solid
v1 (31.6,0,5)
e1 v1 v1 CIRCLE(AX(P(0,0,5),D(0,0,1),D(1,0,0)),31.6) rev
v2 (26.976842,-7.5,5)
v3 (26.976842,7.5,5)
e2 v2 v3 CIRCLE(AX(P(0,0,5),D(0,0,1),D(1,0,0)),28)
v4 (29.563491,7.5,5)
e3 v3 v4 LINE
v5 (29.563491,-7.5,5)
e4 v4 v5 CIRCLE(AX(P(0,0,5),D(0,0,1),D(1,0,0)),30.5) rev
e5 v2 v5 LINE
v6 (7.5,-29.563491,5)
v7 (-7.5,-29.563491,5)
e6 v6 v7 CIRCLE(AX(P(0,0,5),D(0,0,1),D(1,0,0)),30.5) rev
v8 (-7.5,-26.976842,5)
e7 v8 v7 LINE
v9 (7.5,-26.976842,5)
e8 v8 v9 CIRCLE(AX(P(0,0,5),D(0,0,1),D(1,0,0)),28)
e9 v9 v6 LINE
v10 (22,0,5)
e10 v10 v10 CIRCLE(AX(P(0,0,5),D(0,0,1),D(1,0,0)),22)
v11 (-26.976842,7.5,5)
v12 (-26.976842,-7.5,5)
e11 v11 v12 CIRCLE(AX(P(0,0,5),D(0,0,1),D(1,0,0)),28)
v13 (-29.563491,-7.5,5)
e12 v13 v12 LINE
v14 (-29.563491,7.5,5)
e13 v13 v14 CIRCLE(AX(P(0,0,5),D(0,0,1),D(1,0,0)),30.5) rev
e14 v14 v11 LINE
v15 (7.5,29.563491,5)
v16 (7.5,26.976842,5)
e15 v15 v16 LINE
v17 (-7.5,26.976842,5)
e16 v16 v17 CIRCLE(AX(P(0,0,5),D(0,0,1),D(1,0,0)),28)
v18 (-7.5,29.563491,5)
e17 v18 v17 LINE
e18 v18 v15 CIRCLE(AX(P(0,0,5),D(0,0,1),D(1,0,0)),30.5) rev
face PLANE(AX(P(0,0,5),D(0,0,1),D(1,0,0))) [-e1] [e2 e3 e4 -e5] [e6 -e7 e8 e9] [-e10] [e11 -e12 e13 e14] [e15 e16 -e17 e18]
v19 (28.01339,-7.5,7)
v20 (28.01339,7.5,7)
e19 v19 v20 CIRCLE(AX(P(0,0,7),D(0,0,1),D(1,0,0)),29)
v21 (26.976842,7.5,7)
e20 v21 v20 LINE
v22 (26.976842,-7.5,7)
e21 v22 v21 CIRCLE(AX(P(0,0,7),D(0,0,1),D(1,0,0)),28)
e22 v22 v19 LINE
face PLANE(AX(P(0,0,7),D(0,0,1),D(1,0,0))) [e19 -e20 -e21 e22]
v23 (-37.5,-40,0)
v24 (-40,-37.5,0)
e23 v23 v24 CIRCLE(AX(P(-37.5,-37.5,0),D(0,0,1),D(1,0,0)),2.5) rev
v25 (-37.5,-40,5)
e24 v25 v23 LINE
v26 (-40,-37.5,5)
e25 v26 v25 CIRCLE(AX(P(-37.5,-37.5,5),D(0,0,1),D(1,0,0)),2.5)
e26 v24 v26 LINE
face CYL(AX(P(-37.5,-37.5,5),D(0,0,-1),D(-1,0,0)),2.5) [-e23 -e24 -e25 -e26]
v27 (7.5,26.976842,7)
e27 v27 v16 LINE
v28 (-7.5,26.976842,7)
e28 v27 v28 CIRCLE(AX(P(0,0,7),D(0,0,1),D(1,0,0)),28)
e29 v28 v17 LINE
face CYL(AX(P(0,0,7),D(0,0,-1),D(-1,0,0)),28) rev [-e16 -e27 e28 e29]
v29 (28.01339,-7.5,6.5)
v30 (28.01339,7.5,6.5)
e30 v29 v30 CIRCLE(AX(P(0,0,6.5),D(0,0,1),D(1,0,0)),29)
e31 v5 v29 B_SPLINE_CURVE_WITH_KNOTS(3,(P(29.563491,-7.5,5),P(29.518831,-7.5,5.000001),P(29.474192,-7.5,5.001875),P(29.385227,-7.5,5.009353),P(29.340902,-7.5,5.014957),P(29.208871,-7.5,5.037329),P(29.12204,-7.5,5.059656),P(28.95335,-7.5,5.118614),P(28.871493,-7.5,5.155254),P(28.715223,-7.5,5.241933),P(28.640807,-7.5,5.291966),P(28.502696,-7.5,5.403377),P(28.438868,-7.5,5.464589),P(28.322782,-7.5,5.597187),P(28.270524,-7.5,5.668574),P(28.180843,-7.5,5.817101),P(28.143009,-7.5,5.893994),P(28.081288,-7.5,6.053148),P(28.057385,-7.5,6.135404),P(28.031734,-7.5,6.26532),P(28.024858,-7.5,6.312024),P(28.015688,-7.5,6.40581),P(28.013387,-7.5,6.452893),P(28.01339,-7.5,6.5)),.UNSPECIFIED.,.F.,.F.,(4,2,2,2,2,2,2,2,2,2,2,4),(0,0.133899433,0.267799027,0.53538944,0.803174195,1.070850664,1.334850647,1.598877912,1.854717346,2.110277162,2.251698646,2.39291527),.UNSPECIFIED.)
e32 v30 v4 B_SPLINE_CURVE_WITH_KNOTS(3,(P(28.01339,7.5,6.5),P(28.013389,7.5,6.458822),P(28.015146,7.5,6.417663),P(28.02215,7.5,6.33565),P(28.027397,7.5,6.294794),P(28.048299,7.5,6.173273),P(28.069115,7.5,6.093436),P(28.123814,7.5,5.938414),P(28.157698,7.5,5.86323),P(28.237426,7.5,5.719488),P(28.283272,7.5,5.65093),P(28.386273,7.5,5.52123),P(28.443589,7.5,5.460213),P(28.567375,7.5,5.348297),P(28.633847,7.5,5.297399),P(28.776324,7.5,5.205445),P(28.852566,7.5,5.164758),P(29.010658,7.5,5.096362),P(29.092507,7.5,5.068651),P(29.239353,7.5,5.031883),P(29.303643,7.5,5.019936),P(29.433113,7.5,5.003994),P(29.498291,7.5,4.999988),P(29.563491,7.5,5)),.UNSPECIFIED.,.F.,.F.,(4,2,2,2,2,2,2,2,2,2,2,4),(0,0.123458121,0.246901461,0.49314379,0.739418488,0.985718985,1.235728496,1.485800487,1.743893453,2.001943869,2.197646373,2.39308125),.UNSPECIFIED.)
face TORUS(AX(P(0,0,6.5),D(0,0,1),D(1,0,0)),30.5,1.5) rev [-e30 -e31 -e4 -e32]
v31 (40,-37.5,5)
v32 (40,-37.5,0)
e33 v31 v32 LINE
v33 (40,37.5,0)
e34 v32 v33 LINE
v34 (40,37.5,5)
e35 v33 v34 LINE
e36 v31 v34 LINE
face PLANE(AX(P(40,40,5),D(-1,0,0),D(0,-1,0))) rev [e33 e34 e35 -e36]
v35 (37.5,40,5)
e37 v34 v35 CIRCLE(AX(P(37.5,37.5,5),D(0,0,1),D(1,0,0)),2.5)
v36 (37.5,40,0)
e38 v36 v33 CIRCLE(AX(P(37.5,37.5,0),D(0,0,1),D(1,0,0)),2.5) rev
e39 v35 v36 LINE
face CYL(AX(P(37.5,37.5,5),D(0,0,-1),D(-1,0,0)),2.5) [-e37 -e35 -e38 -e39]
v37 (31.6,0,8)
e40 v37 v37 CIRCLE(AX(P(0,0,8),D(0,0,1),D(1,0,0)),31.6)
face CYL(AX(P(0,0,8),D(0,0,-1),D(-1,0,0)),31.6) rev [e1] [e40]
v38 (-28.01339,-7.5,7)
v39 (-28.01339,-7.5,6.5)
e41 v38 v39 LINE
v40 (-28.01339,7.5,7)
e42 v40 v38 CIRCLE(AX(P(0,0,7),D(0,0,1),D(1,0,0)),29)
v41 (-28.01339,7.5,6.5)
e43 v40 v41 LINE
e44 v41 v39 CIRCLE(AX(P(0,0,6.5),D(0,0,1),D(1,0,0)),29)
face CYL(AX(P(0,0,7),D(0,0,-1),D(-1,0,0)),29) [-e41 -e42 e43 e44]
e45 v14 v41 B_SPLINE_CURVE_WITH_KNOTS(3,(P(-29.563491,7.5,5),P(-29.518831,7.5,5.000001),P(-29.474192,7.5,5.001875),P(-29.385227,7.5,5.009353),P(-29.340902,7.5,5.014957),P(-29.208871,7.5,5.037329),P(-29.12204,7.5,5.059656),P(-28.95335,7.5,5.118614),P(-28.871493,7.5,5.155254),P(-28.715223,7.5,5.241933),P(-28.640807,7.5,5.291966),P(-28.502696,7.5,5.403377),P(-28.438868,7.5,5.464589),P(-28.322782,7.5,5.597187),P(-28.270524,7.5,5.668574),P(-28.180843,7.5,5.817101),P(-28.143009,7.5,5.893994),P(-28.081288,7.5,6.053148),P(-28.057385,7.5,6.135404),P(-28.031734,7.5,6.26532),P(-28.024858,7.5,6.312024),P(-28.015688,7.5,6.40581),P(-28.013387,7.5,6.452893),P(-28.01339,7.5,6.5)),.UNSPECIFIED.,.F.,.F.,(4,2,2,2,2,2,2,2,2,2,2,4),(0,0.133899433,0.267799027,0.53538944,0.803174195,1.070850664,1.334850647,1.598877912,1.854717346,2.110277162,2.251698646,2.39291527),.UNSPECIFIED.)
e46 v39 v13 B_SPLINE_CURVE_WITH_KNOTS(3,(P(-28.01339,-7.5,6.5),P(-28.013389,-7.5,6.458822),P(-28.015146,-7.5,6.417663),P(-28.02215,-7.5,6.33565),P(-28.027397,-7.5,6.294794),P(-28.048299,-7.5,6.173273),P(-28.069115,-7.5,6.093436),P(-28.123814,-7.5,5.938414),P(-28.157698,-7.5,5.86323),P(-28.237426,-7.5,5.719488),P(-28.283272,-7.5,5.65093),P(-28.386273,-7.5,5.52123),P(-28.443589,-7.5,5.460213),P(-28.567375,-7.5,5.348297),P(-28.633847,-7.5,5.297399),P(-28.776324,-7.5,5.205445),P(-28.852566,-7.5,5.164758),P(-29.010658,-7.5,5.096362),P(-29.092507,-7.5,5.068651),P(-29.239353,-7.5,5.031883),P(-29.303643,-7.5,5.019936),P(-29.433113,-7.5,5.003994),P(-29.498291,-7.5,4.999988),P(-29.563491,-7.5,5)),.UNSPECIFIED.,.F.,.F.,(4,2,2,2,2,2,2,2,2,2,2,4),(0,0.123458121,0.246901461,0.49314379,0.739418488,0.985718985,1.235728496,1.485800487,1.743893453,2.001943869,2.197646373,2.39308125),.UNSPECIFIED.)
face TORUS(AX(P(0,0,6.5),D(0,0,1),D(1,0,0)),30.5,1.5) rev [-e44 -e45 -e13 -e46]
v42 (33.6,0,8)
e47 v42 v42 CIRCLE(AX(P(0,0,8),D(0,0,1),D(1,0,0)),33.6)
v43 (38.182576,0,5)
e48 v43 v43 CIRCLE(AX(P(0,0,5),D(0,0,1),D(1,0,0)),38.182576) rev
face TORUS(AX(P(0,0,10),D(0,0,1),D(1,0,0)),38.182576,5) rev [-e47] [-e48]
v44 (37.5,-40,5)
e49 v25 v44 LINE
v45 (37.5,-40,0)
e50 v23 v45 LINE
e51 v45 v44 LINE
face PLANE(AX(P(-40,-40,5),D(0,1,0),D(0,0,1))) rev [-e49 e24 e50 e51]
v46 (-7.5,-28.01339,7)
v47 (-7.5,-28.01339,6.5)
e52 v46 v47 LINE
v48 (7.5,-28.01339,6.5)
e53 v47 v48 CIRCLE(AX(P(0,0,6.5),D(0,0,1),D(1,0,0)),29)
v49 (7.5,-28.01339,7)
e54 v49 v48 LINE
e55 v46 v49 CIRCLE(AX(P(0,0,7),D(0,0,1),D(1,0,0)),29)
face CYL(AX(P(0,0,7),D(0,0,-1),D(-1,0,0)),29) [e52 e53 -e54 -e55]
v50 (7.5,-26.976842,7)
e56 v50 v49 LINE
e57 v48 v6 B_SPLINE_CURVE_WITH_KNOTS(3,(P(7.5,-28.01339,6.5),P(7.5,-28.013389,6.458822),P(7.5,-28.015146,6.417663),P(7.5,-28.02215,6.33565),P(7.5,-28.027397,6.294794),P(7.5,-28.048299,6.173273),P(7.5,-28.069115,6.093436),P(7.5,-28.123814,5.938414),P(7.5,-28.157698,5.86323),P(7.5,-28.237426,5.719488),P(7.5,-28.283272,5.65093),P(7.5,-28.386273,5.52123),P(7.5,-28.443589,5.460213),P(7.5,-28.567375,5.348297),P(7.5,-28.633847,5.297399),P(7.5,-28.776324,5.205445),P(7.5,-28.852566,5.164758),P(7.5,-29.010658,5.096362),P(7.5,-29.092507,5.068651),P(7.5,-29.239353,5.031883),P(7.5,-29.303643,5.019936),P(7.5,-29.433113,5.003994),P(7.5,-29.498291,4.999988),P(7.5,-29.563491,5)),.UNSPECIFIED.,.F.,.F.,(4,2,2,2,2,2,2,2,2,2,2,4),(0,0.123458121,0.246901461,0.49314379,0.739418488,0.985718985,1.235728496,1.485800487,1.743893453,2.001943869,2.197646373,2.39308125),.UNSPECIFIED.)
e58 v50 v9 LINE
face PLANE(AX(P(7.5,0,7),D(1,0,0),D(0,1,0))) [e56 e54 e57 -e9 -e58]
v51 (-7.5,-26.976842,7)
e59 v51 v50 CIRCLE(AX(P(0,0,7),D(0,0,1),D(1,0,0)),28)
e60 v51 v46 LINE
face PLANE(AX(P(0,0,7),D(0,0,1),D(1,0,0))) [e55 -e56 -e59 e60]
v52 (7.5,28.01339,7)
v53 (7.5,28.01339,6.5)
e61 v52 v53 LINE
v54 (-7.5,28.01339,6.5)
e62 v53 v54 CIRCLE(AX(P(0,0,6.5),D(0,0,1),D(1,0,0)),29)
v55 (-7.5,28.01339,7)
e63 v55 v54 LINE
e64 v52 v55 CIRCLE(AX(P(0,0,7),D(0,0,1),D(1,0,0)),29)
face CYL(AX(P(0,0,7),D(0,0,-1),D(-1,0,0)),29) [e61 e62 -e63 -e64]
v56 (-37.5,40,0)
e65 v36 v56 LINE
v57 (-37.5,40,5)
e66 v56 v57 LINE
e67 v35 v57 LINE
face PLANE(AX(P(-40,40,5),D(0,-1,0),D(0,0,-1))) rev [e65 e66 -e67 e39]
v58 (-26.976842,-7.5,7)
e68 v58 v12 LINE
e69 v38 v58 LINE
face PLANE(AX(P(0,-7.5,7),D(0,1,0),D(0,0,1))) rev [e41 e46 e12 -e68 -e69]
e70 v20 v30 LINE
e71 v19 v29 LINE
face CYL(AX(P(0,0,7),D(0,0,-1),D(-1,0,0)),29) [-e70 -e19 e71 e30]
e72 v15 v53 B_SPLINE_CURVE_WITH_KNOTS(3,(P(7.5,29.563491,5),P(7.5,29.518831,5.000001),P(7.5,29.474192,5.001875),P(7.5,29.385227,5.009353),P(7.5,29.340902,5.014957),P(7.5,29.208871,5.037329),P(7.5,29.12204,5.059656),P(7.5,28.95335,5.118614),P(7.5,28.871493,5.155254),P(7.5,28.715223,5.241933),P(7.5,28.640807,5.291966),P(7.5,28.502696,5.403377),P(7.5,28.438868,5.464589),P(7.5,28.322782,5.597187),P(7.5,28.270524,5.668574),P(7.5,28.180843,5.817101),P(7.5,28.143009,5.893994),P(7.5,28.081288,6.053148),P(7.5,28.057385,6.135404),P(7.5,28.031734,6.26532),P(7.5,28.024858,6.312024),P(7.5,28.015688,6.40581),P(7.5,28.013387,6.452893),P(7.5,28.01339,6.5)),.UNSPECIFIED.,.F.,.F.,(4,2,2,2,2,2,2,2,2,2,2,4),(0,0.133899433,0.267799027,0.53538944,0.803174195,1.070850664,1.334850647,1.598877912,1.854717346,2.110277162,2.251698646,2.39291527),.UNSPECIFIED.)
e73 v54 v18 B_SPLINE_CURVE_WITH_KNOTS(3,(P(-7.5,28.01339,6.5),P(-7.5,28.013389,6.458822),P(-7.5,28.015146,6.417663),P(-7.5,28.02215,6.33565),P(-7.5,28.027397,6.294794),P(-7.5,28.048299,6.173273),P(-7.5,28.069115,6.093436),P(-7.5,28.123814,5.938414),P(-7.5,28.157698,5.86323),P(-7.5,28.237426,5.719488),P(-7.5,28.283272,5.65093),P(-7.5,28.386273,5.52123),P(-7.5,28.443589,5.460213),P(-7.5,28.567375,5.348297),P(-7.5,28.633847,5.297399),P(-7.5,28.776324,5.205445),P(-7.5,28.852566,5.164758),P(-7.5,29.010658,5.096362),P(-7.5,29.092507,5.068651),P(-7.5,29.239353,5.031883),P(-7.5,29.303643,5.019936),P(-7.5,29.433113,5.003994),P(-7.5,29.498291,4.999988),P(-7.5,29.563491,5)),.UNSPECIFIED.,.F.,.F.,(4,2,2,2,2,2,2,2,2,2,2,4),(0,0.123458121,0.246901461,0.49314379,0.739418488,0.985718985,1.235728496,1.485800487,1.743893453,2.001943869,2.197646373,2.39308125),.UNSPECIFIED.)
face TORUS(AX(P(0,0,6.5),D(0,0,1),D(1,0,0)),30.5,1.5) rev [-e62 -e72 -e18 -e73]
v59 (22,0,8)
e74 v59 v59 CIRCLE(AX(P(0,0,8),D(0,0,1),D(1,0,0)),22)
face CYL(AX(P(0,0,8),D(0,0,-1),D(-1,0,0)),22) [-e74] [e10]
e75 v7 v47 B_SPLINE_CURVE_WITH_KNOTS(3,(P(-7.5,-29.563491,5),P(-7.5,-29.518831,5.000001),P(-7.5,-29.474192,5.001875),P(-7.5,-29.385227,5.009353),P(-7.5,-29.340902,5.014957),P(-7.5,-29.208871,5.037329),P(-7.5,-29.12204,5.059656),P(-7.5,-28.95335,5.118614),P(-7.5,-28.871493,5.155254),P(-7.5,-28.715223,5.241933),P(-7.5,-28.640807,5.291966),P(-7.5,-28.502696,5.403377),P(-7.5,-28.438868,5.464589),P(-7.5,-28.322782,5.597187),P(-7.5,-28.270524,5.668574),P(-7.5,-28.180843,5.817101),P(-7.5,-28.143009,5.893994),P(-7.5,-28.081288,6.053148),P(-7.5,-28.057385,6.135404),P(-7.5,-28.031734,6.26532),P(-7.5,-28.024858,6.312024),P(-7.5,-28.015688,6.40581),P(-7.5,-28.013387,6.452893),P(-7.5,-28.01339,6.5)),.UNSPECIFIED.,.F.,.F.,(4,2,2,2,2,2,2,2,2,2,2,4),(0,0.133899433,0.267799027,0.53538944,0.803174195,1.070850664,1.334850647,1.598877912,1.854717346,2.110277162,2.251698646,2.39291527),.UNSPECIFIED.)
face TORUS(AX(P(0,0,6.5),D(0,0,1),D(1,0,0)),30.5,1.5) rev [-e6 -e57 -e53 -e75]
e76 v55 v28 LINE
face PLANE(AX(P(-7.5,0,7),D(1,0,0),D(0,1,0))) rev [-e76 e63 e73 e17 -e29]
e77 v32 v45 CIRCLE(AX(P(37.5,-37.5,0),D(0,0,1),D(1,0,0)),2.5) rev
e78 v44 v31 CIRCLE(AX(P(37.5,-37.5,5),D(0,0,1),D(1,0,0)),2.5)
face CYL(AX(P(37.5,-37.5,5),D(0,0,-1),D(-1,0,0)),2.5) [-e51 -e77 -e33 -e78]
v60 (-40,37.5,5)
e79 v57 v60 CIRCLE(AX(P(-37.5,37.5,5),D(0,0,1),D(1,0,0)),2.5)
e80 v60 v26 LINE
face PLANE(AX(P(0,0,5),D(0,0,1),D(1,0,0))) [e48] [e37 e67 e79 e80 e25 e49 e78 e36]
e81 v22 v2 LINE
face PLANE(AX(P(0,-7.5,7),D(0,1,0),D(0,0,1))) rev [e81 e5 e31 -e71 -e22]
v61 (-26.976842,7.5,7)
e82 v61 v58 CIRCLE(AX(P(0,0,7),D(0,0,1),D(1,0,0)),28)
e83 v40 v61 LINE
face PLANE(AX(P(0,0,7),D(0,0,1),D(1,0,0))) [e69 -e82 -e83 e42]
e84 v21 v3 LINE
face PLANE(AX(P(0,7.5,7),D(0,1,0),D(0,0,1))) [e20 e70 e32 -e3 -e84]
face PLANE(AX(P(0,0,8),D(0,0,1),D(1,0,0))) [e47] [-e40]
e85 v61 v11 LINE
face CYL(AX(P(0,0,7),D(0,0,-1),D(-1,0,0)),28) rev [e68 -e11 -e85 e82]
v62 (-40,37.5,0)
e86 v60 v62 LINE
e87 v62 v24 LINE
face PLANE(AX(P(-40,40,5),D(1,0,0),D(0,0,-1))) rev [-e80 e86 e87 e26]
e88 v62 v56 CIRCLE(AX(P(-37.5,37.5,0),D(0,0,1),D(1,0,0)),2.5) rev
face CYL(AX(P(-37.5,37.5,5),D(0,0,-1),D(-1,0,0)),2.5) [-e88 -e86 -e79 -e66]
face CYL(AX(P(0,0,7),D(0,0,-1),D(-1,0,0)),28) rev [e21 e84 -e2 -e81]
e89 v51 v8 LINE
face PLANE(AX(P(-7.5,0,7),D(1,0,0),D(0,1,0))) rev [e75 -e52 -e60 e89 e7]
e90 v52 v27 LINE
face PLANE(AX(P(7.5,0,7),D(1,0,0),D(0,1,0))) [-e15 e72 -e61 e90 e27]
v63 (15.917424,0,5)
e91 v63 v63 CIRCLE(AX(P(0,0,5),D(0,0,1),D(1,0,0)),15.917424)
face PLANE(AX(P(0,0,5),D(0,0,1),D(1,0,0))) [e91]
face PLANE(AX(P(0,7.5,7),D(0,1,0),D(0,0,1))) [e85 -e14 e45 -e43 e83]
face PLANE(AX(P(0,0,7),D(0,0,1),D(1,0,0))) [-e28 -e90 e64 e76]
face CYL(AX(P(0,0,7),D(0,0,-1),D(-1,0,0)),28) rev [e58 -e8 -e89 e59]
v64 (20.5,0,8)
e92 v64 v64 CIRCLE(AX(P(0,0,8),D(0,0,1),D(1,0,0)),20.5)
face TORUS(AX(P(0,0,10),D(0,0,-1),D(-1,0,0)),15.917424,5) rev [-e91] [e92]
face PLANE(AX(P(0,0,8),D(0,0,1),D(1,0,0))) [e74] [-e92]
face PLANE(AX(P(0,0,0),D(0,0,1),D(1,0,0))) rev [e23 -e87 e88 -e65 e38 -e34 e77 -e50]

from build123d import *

# Parameters (mm, degrees)
SKETCH1_W           = 80
SKETCH1_H           = 80
BOSS_EXTRUDE1_DEPTH = 5
FILLET1_R           = 2.5
BOSS_EXTRUDE5_DEPTH = 2
SKETCH12_R          = 33.6
SKETCH12_R_2        = 31.6
BOSS_EXTRUDE8_DEPTH = 3
SKETCH13_R          = 22
SKETCH13_R_2        = 20.5
BOSS_EXTRUDE9_DEPTH = 3
FILLET2_R           = 1.5
FILLET3_R           = 5


with BuildPart() as part:
    # Sketch1 → Boss-Extrude1 (new body)
    with BuildSketch(Plane.XY):
        Rectangle(SKETCH1_W, SKETCH1_H)
    extrude(amount=BOSS_EXTRUDE1_DEPTH)

    # Fillet1
    fillet1_edges = [part.edges().sort_by_distance(p)[0] for p in [
        (40, -40, 2.5),
        (-40, -40, 2.5),
        (-40, 40, 2.5),
        (40, 40, 2.5),
    ]]
    fillet(fillet1_edges, radius=FILLET1_R)

    # Sketch5 → Boss-Extrude5 (add)
    with BuildSketch(Plane.XY.offset(5)):
        with BuildLine():
            ThreePointArc((7.5, 28.013389656), (3.782307496, 28.752289474), (0, 29))
            ThreePointArc((0, 29), (-3.782307496, 28.752289474), (-7.5, 28.013389656))
            Line((-7.5, 28.013389656), (-7.5, 26.97684192))
            ThreePointArc((-7.5, 26.97684192), (0, 28), (7.5, 26.97684192))
            Line((7.5, 26.97684192), (7.5, 28.013389656))
        make_face()
        with BuildLine():
            ThreePointArc((7.5, -26.97684192), (0, -28), (-7.5, -26.97684192))
            Line((-7.5, -26.97684192), (-7.5, -28.013389656))
            ThreePointArc((-7.5, -28.013389656), (-3.782307496, -28.752289474), (0, -29))
            ThreePointArc((0, -29), (3.782307496, -28.752289474), (7.5, -28.013389656))
            Line((7.5, -28.013389656), (7.5, -26.97684192))
        make_face()
        with BuildLine():
            Line((-26.97684192, 7.5), (-28.013389656, 7.5))
            ThreePointArc((-28.013389656, 7.5), (-28.752289466, 3.782307556), (-29, 1.22e-07))
            ThreePointArc((-29, 1.22e-07), (-28.752289482, -3.782307436), (-28.013389656, -7.5))
            Line((-28.013389656, -7.5), (-26.97684192, -7.5))
            ThreePointArc((-26.97684192, -7.5), (-28, 0), (-26.97684192, 7.5))
        make_face()
        with BuildLine():
            ThreePointArc((29, 0), (28.752289474, 3.782307496), (28.013389656, 7.5))
            Line((28.013389656, 7.5), (26.97684192, 7.5))
            ThreePointArc((26.97684192, 7.5), (27.743031321, 3.78473422), (28, 0))
            ThreePointArc((28, 0), (27.743031321, -3.78473422), (26.97684192, -7.5))
            Line((26.97684192, -7.5), (28.013389656, -7.5))
            ThreePointArc((28.013389656, -7.5), (28.752289474, -3.782307496), (29, 0))
        make_face()
    extrude(amount=BOSS_EXTRUDE5_DEPTH)

    # Sketch12 → Boss-Extrude8 (add)
    with BuildSketch(Plane.XY.offset(5)):
        Circle(SKETCH12_R)
        Circle(SKETCH12_R_2, mode=Mode.SUBTRACT)
    extrude(amount=BOSS_EXTRUDE8_DEPTH)

    # Sketch13 → Boss-Extrude9 (add)
    with BuildSketch(Plane.XY.offset(5)):
        Circle(SKETCH13_R)
        Circle(SKETCH13_R_2, mode=Mode.SUBTRACT)
    extrude(amount=BOSS_EXTRUDE9_DEPTH)

    # Fillet2
    fillet2_edges = [part.edges().sort_by_distance(p)[0] for p in [
        (0, 29, 5),
        (29, 0, 5),
        (-29, 0, 5),
        (0, -29, 5),
    ]]
    fillet(fillet2_edges, radius=FILLET2_R)

    # Fillet3
    # the kernel refuses this fillet: 5 mm, written as the material it adds along each edge
    with BuildSketch(Plane(origin=(0, 0, 5), x_dir=(1, 0, 0), z_dir=(0, -1, 0))) as fillet3_piece_1:
        with BuildLine():
            CenterArc((38.182575695, 5), FILLET3_R, 203.578178478, 66.421821522)
            Line((38.182575695, 0), (38.182575695, -0.1))
            Line((38.182575695, -0.1), (33.6, -0.1))
            Line((33.6, -0.1), (33.5, 0))
            ThreePointArc((33.5, 0), (33.5, 1.5), (33.508348486, 2.96))
            Line((33.508348486, 2.96), (33.6, 3))
        make_face()
    revolve(axis=Axis((0, 0, 5), (0, 0, 1)))
    with BuildSketch(Plane(origin=(0, 0, 5), x_dir=(1, 0, 0), z_dir=(0, -1, 0))) as fillet3_piece_2:
        with BuildLine():
            CenterArc((15.917424305, 5), FILLET3_R, 270, 66.421821522)
            Line((15.917424305, 0), (15.917424305, -0.1))
            Line((15.917424305, -0.1), (20.5, -0.1))
            Line((20.5, -0.1), (20.6, 0))
            ThreePointArc((20.6, 0), (20.6, 1.5), (20.591651514, 2.96))
            Line((20.591651514, 2.96), (20.5, 3))
        make_face()
    revolve(axis=Axis((0, 0, 5), (0, 0, 1)))


solid = part.part
